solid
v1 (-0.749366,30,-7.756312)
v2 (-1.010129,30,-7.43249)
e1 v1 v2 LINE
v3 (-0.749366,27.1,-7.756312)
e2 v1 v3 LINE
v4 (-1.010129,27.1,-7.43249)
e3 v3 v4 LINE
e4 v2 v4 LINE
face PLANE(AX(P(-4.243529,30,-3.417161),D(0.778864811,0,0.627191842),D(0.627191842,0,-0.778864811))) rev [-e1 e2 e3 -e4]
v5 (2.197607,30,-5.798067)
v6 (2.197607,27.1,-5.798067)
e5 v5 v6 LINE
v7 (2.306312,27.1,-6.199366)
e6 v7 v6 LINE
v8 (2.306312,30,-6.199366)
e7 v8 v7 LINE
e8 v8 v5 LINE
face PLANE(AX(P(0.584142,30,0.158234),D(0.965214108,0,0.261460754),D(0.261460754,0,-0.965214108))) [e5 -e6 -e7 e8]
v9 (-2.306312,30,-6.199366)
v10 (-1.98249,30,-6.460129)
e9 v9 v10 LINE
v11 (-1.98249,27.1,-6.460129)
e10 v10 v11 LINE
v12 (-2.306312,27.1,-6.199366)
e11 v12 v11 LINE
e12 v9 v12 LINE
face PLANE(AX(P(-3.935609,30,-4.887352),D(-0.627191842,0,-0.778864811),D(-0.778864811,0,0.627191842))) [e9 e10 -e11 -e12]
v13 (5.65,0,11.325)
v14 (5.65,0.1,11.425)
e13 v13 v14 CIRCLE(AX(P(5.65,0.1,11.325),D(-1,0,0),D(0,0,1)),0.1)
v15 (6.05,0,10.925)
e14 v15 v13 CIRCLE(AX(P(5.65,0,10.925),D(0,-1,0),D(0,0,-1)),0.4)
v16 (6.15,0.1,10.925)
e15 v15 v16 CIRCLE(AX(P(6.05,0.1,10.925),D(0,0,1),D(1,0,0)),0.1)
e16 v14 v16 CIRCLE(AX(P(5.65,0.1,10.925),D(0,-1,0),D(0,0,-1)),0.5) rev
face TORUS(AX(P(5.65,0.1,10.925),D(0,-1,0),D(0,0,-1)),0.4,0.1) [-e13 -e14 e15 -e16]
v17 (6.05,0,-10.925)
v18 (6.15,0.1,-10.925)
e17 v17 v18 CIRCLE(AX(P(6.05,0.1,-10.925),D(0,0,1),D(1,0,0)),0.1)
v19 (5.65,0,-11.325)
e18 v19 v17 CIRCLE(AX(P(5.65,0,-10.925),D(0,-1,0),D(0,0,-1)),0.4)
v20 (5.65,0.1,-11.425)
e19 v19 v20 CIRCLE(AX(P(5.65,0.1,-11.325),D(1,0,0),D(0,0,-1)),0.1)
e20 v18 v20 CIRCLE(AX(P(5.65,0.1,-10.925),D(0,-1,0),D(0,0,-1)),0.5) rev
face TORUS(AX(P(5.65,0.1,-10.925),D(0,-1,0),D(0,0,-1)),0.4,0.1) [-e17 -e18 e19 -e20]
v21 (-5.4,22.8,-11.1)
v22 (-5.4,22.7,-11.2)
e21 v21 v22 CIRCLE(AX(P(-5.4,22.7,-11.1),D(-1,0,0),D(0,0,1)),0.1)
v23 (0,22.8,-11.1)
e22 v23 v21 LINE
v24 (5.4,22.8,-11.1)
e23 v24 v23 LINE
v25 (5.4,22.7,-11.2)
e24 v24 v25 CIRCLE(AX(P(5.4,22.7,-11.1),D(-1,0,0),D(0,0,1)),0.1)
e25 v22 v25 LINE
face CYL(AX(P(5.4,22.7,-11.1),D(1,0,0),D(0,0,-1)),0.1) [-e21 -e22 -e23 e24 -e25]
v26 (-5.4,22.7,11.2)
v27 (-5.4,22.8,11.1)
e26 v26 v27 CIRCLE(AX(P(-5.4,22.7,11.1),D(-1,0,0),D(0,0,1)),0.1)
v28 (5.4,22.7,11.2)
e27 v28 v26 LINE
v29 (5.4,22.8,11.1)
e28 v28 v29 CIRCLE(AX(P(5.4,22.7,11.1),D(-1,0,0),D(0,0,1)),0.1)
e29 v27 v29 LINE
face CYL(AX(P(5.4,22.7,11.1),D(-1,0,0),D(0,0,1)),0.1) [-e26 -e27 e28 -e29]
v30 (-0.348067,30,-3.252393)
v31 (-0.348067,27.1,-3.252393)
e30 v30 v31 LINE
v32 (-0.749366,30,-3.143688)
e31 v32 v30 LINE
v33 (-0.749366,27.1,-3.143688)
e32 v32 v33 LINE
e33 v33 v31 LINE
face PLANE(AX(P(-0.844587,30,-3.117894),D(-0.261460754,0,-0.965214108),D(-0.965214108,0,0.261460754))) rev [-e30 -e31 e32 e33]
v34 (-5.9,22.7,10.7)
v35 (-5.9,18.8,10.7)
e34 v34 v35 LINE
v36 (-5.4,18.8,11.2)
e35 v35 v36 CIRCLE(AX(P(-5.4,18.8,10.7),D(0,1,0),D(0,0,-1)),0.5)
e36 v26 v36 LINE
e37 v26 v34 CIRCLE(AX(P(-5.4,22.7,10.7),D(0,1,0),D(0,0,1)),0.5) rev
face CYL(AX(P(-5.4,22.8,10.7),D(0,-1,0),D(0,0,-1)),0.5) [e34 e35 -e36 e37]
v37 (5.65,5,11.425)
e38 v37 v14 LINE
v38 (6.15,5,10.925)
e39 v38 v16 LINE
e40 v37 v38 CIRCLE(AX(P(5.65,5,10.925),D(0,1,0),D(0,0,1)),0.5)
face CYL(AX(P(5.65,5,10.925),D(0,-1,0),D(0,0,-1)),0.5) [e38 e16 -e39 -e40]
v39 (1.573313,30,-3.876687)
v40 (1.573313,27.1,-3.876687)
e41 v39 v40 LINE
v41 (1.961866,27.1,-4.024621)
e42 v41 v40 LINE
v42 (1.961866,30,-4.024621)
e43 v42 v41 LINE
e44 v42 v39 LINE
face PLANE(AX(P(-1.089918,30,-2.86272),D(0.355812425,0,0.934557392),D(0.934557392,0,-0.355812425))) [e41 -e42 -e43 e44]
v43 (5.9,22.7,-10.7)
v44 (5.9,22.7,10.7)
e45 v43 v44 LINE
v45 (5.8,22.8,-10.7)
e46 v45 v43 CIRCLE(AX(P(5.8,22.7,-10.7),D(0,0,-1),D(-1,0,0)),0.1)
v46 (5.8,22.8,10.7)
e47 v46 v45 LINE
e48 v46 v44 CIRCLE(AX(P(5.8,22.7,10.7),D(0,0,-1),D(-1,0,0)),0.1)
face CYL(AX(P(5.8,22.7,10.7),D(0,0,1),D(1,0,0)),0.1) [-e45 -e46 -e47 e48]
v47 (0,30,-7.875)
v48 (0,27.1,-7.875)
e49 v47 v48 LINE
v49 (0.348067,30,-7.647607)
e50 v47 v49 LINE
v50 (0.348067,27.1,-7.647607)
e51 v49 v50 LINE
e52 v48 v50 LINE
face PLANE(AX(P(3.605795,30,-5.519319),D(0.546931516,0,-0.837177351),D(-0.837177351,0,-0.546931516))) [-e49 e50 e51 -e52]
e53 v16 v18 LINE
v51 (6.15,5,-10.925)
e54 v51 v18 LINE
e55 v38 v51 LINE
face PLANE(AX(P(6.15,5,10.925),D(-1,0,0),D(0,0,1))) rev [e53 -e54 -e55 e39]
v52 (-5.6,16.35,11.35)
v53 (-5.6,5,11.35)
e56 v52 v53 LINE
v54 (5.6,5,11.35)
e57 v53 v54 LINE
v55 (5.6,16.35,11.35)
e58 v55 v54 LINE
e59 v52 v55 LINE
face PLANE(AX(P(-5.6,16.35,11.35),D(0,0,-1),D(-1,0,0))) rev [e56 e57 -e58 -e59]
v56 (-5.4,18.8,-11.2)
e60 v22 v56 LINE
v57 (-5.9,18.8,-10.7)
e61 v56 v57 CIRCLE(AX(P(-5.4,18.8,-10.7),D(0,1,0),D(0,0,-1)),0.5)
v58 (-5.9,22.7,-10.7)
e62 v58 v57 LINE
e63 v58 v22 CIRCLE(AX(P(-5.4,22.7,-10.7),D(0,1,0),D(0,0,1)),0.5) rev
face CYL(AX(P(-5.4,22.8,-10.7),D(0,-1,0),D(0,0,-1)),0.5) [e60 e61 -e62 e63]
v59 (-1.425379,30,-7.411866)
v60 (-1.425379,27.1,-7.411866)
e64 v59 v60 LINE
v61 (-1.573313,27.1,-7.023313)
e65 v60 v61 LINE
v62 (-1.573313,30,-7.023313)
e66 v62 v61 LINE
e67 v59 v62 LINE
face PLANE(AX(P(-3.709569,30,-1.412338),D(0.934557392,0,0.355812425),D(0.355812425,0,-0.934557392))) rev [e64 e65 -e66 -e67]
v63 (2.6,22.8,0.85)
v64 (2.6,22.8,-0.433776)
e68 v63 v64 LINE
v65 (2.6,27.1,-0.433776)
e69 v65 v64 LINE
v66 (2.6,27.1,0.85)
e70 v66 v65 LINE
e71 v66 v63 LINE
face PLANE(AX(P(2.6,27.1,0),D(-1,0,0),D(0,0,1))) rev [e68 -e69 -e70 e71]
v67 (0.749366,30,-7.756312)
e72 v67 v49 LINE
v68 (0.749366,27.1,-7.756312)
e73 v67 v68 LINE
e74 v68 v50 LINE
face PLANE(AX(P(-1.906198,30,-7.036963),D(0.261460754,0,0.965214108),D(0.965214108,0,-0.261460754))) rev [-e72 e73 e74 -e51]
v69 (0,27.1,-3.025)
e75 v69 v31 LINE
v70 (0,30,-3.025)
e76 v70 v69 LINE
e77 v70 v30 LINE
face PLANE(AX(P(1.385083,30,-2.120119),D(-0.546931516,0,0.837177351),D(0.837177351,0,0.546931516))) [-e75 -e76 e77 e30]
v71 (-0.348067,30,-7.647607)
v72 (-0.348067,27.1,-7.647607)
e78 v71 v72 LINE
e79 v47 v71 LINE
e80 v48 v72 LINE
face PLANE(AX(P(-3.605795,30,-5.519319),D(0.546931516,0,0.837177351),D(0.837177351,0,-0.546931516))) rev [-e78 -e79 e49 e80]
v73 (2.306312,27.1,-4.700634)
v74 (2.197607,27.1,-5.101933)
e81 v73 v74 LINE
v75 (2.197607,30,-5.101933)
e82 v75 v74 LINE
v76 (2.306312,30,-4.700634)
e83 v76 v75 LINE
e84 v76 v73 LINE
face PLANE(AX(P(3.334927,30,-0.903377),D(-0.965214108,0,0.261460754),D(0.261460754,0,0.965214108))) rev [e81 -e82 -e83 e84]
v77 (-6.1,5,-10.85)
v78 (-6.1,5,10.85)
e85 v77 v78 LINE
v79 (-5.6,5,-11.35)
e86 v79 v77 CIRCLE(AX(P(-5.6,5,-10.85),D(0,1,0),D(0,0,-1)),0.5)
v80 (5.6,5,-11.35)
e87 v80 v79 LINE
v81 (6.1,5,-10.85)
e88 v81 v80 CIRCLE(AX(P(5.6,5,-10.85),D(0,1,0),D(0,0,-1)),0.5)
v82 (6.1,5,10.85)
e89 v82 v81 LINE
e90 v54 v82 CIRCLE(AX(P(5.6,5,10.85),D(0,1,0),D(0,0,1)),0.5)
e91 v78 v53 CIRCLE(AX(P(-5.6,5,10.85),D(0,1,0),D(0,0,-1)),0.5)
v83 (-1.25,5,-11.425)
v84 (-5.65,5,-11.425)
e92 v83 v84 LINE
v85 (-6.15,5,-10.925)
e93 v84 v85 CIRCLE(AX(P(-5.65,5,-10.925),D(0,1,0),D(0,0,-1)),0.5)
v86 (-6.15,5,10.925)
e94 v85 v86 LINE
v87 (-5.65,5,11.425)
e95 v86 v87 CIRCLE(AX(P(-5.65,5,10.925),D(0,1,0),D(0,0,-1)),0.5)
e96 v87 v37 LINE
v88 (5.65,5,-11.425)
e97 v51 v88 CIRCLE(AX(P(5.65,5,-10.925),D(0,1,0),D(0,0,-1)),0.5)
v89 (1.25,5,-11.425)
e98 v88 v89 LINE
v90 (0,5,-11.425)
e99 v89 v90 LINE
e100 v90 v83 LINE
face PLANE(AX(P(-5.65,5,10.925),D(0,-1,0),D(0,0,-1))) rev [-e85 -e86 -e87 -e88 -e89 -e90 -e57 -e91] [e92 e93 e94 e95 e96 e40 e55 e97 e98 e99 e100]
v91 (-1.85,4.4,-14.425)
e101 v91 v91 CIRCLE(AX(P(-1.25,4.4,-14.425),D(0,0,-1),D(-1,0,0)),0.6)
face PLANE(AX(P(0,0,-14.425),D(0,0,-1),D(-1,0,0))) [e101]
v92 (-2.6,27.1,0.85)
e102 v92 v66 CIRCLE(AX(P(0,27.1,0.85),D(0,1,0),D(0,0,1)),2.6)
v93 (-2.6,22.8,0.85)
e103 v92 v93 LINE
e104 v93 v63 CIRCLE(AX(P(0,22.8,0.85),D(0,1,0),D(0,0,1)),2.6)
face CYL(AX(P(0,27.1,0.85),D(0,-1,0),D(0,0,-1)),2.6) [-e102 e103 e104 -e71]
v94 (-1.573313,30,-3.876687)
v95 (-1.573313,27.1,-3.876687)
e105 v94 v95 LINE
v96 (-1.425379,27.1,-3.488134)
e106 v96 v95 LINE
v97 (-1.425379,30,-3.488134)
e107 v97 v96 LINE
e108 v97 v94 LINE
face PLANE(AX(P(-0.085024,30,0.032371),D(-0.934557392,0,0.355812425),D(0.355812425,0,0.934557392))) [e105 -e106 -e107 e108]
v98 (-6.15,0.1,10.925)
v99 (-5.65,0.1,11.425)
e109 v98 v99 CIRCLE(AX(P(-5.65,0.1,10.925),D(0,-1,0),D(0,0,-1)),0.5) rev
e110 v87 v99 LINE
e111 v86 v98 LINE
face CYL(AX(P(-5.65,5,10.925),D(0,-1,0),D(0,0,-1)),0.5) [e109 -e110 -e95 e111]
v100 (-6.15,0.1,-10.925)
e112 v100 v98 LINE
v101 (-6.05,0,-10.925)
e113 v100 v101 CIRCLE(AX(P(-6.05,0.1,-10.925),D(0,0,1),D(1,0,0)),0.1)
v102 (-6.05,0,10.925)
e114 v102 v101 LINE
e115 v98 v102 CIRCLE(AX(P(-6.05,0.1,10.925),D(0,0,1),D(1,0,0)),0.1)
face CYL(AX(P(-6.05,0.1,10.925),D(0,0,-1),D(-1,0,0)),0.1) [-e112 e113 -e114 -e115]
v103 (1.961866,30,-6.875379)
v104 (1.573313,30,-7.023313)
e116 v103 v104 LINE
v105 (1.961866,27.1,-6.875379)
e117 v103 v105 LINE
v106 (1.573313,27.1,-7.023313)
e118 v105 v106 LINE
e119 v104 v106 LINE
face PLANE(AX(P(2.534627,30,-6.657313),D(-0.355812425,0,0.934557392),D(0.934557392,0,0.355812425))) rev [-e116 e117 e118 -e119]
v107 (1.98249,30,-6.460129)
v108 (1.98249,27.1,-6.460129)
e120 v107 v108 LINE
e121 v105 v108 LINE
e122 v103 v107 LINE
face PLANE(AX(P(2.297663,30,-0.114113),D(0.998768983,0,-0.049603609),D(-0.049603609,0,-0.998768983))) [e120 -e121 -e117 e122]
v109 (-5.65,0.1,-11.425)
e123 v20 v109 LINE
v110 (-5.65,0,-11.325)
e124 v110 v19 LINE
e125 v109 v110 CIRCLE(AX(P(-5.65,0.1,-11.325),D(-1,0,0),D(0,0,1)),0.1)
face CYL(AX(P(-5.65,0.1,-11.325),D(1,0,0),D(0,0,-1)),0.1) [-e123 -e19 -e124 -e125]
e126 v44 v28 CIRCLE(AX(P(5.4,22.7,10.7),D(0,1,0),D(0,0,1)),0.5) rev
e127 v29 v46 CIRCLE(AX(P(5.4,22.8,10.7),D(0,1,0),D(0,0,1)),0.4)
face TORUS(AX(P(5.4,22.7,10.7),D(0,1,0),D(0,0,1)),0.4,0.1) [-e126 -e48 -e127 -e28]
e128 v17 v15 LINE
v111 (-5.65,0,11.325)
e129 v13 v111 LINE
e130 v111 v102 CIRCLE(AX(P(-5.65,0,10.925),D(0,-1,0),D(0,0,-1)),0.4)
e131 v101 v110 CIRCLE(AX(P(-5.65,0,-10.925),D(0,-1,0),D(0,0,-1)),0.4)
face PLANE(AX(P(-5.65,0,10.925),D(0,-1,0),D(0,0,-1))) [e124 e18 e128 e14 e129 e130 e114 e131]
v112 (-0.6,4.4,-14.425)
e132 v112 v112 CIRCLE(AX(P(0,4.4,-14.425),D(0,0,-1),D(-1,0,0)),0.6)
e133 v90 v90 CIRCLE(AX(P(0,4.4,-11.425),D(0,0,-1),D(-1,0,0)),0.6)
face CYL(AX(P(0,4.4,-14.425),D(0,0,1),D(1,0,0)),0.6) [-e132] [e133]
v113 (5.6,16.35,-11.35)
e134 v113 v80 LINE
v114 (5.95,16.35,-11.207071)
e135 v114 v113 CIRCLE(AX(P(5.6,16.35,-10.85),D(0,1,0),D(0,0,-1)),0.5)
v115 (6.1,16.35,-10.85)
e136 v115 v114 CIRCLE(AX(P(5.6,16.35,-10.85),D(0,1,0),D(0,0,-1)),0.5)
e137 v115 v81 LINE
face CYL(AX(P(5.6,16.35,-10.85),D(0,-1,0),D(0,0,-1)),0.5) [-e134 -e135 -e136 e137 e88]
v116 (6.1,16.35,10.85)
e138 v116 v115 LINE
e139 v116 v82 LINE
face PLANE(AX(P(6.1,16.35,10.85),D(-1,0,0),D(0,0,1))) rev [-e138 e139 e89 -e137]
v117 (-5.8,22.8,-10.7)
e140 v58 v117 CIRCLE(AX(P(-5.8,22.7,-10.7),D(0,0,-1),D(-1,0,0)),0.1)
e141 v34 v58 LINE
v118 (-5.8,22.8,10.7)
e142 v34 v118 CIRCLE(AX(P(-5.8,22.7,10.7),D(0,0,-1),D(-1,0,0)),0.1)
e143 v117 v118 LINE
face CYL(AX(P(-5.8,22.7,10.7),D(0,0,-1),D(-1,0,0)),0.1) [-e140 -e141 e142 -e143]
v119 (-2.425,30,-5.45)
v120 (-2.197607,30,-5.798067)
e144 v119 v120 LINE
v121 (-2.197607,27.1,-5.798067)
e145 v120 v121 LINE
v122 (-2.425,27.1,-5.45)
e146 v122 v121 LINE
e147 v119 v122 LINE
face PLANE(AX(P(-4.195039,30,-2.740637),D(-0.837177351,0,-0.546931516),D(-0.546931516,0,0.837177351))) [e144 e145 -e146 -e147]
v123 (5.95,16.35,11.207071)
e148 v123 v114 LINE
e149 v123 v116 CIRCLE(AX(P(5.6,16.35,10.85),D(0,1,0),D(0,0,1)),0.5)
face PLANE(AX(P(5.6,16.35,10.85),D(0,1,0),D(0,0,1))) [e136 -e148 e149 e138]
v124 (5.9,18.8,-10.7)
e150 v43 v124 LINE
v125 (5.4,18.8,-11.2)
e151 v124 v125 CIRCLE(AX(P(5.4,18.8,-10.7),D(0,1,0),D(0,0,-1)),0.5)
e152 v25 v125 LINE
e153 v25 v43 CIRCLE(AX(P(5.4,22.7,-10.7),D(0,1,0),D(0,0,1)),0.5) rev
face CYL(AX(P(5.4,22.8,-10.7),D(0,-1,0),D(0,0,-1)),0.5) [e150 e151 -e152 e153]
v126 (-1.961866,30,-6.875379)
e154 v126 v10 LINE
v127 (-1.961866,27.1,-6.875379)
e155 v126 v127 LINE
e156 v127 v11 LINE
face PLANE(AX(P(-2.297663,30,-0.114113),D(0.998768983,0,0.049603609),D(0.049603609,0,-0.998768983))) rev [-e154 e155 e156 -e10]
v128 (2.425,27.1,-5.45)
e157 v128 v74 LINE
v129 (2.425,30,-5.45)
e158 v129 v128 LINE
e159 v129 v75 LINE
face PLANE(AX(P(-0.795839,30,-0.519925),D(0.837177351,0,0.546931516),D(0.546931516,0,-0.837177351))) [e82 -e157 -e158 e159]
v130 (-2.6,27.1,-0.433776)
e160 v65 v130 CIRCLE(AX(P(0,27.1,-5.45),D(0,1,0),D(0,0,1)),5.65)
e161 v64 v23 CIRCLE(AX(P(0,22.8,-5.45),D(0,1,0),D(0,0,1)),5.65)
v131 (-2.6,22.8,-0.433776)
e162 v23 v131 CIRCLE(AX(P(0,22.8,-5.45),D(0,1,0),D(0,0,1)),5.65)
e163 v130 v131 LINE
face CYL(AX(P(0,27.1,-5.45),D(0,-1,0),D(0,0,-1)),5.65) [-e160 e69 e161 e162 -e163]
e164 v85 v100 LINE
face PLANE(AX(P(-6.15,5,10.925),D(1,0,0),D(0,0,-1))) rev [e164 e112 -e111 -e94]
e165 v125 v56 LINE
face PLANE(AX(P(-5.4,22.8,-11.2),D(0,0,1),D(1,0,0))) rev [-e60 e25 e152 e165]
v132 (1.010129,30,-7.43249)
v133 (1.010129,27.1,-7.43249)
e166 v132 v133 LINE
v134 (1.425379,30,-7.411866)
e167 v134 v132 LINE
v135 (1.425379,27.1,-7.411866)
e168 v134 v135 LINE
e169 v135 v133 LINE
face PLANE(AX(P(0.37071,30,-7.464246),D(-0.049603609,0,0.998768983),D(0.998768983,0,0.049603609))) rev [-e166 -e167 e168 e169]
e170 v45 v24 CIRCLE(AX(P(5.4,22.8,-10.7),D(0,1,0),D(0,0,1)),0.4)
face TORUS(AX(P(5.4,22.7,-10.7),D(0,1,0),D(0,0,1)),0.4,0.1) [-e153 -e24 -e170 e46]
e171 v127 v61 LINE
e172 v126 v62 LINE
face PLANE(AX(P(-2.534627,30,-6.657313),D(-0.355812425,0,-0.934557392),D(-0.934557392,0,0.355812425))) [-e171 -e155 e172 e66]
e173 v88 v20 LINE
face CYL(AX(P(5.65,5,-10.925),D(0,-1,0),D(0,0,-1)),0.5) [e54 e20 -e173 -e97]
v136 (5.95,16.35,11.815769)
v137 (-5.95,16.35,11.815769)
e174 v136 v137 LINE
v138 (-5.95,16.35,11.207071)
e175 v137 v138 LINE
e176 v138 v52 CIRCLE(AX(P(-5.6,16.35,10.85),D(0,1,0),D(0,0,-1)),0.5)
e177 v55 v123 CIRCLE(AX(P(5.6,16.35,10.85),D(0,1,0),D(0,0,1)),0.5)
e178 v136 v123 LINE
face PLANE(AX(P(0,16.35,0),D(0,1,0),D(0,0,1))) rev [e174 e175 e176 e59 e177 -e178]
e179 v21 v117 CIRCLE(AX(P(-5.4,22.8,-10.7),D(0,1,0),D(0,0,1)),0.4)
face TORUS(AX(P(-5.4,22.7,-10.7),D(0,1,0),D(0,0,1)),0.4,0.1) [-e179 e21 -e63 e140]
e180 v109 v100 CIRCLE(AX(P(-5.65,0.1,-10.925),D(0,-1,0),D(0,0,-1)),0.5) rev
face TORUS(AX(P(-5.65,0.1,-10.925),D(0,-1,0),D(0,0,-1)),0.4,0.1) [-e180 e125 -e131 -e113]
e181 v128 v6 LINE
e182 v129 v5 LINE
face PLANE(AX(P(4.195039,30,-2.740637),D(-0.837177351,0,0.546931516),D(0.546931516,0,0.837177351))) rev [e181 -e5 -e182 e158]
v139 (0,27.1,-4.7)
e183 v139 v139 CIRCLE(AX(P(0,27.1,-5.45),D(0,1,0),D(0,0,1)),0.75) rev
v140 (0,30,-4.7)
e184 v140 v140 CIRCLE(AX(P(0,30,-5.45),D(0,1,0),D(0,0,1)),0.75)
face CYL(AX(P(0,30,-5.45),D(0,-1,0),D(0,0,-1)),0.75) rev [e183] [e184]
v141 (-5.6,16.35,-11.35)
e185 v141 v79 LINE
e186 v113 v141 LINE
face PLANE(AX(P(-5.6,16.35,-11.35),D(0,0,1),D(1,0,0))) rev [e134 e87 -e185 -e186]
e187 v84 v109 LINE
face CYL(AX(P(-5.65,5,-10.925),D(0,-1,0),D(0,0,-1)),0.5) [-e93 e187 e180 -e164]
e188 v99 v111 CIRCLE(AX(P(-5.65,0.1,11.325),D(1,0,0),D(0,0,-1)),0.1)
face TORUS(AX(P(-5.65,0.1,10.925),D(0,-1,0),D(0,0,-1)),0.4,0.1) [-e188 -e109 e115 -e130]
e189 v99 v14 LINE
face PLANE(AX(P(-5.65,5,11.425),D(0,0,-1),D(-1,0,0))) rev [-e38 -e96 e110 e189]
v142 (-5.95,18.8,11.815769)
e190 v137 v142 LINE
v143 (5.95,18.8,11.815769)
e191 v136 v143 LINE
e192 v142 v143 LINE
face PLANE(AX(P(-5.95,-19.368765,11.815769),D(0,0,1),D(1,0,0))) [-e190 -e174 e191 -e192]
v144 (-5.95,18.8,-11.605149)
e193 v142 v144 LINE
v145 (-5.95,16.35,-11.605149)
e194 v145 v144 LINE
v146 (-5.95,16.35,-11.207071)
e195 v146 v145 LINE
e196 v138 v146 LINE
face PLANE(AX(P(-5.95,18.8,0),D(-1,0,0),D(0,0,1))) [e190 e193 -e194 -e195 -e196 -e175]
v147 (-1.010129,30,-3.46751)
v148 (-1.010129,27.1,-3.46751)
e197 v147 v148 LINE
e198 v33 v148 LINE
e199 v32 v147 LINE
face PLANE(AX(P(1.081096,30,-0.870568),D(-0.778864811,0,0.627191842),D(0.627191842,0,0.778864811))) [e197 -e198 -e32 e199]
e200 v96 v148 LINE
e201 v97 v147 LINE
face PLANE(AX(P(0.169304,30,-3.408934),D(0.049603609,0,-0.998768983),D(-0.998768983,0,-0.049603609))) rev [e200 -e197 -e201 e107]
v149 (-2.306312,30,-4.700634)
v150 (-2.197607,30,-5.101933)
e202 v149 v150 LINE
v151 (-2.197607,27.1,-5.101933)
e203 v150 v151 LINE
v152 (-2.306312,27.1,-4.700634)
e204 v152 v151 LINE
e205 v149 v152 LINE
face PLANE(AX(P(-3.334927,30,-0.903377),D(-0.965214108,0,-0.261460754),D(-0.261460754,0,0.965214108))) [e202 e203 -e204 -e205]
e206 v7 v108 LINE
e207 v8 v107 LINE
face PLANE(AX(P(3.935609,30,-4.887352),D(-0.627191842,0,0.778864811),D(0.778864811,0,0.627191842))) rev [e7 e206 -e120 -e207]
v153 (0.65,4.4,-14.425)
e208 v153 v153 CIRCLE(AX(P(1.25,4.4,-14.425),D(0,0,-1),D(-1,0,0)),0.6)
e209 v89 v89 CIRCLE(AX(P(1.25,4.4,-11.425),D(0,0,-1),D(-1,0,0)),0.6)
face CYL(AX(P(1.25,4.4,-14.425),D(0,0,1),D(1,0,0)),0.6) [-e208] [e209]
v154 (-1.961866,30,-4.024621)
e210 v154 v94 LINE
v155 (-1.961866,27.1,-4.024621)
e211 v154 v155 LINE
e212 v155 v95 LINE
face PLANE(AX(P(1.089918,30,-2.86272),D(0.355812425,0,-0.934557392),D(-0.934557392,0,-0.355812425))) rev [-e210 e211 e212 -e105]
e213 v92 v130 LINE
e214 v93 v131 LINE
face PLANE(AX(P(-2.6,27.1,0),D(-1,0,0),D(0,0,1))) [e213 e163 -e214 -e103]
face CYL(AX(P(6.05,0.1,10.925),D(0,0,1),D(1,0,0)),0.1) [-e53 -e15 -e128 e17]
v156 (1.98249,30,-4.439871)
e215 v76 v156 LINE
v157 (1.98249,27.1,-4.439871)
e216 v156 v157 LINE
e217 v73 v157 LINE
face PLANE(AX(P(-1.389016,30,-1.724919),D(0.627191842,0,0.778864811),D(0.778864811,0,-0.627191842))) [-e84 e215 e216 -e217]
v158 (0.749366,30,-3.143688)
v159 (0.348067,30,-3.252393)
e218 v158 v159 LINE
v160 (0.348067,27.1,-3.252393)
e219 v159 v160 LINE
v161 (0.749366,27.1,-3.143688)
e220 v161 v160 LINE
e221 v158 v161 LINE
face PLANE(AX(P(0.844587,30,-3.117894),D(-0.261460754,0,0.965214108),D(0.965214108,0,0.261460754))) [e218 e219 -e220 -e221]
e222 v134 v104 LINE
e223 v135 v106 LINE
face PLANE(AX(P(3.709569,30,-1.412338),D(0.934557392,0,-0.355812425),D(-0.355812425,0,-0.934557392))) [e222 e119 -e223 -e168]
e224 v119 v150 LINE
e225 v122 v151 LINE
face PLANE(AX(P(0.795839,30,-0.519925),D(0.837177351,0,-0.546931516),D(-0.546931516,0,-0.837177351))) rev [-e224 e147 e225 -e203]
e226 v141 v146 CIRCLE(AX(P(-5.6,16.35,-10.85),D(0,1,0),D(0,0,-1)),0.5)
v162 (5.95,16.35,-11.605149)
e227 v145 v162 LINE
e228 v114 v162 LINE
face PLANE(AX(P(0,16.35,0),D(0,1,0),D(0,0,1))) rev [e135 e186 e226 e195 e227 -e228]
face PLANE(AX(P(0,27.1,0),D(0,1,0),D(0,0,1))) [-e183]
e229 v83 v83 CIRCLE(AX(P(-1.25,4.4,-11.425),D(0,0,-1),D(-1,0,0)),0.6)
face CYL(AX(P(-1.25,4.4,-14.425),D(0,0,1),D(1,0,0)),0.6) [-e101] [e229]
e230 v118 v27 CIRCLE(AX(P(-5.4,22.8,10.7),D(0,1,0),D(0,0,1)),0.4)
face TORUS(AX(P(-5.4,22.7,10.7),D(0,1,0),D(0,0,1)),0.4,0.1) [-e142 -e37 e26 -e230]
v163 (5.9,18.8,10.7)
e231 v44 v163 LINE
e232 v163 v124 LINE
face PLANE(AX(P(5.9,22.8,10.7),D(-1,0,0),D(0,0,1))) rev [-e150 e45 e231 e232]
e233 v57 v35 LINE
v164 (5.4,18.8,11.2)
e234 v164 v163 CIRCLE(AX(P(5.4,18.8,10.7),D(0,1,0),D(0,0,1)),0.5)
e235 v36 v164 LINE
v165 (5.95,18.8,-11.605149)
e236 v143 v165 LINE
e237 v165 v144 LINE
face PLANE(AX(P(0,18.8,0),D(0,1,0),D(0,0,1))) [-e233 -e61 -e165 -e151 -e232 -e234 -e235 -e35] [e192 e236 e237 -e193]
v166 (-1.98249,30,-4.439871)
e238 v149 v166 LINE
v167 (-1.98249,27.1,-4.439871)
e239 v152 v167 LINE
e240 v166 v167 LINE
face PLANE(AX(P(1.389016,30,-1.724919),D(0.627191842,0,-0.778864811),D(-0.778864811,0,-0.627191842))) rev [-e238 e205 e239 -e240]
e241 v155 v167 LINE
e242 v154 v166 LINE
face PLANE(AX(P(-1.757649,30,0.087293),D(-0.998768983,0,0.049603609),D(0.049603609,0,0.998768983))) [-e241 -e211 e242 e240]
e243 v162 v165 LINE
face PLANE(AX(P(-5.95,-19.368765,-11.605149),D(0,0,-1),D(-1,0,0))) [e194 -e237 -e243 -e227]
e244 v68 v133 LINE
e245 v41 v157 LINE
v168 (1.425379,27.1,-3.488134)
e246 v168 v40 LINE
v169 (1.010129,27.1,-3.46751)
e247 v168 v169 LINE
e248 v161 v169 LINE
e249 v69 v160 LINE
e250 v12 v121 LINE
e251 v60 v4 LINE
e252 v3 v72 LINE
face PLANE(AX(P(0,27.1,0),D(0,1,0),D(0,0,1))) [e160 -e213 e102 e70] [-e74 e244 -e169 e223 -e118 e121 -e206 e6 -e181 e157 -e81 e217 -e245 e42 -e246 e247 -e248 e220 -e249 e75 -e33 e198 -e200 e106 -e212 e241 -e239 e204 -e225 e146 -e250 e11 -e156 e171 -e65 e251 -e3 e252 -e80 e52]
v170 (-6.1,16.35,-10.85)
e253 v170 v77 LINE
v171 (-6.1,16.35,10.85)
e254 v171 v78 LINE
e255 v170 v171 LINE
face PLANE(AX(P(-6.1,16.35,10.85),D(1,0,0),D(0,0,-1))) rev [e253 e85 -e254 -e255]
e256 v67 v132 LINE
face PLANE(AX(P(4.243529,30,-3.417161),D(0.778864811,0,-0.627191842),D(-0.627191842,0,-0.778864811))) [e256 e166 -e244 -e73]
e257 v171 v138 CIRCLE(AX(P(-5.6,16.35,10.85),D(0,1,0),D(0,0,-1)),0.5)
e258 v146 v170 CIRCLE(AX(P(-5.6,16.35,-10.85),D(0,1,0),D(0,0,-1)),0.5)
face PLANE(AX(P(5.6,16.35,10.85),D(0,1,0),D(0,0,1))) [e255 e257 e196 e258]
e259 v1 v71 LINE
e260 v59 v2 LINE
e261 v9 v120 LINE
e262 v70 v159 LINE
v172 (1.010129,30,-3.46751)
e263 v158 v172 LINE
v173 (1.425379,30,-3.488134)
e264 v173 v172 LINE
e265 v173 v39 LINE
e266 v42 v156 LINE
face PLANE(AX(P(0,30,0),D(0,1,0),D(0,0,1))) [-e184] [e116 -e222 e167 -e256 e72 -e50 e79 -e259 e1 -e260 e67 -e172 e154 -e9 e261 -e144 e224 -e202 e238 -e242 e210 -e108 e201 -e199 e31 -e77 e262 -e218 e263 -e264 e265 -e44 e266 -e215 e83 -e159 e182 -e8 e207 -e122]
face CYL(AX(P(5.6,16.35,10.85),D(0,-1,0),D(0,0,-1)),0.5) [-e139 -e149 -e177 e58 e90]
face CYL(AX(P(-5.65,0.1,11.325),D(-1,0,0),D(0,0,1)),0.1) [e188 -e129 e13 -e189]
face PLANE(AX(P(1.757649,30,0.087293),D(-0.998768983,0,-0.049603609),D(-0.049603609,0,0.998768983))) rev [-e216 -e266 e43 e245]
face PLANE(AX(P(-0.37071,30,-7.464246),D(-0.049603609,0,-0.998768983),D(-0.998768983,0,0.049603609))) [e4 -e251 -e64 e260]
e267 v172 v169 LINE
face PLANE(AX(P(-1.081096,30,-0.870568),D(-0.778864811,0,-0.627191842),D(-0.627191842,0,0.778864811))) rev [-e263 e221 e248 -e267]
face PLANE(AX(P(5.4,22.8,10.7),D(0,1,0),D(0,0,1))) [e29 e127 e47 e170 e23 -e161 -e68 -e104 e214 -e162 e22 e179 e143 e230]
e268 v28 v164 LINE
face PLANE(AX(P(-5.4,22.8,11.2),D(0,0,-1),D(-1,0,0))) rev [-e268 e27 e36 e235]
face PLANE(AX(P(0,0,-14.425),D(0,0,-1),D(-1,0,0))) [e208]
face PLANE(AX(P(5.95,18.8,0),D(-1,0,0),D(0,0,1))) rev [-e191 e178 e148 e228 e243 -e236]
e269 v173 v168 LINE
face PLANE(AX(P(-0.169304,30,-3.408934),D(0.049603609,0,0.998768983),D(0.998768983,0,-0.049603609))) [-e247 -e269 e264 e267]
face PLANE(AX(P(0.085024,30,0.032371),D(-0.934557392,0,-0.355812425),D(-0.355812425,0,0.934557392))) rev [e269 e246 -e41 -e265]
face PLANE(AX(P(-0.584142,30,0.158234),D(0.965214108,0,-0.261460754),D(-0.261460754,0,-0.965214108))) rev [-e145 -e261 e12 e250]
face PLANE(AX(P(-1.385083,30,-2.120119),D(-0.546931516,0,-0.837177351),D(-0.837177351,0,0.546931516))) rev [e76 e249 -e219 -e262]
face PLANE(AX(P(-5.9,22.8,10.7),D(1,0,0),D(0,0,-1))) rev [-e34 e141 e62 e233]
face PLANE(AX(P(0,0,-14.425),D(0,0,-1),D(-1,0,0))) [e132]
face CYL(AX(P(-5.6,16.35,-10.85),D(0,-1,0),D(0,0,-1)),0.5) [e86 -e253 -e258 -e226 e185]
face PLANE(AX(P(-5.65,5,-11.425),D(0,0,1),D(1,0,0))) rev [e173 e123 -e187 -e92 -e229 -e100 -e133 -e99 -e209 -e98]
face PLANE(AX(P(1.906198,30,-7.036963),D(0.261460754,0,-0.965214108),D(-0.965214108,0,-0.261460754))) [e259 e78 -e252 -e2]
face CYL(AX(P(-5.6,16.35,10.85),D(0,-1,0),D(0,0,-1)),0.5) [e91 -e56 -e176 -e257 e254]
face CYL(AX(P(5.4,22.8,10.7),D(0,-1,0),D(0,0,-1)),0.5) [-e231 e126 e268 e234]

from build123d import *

# Parameters (mm, degrees)
Y_KSEKLIK_EKSTR_ZYON1_DEPTH = 5
Y_KSEKLIK_EKSTR_ZYON2_DEPTH = 11.35
Y_KSEKLIK_EKSTR_ZYON3_DEPTH = 2.45
Y_KSEKLIK_EKSTR_ZYON4_DEPTH = 4
IZIM5_R                     = 5.65
Y_KSEKLIK_EKSTR_ZYON5_DEPTH = 4.3
IZIM7_R                     = 0.75
Y_KSEKLIK_EKSTR_ZYON6_DEPTH = 2.9
RADYUS1_R                   = 0.1
IZIM8_R                     = 0.6
Y_KSEKLIK_EKSTR_ZYON7_DEPTH = 3
SKETCH1_OUTSIDE_W           = 23.446
SKETCH1_OUTSIDE_H           = 43.396
SKETCH1_OUTSIDE_W_2         = 11.9
SKETCH1_OUTSIDE_H_2         = 23.420918094
CUT_EXTRUDE1_DEPTH          = 2.45


with BuildPart() as part:
    # Çizim1 → Yükseklik-Ekstrüzyon1 (new body)
    with BuildSketch(Plane(origin=(0, 0, 0), x_dir=(1, 0, 0), z_dir=(0, 1, 0))):
        with BuildLine():
            Line((-5.65, -11.425), (5.65, -11.425))
            ThreePointArc((5.65, -11.425), (6.003553391, -11.278553391), (6.15, -10.925))
            Line((6.15, -10.925), (6.15, 10.925))
            ThreePointArc((6.15, 10.925), (6.003553391, 11.278553391), (5.65, 11.425))
            Line((5.65, 11.425), (-5.65, 11.425))
            ThreePointArc((-5.65, 11.425), (-6.003553391, 11.278553391), (-6.15, 10.925))
            Line((-6.15, 10.925), (-6.15, -10.925))
            ThreePointArc((-6.15, -10.925), (-6.003553391, -11.278553391), (-5.65, -11.425))
        make_face()
    extrude(amount=Y_KSEKLIK_EKSTR_ZYON1_DEPTH)

    # Çizim2 → Yükseklik-Ekstrüzyon2 (add)
    with BuildSketch(Plane(origin=(0, 5, 0), x_dir=(1, 0, 0), z_dir=(0, 1, 0))):
        with BuildLine():
            Line((-5.6, -11.35), (5.6, -11.35))
            ThreePointArc((5.6, -11.35), (5.953553391, -11.203553391), (6.1, -10.85))
            Line((6.1, -10.85), (6.1, 10.85))
            ThreePointArc((6.1, 10.85), (5.953553391, 11.203553391), (5.6, 11.35))
            Line((5.6, 11.35), (-5.6, 11.35))
            ThreePointArc((-5.6, 11.35), (-5.953553391, 11.203553391), (-6.1, 10.85))
            Line((-6.1, 10.85), (-6.1, -10.85))
            ThreePointArc((-6.1, -10.85), (-5.953553391, -11.203553391), (-5.6, -11.35))
        make_face()
    extrude(amount=Y_KSEKLIK_EKSTR_ZYON2_DEPTH)

    # Çizim3 → Yükseklik-Ekstrüzyon3 (add)
    with BuildSketch(Plane(origin=(0, 16.35, 0), x_dir=(1, 0, 0), z_dir=(0, 1, 0))):
        with BuildLine():
            Line((-5.95, 15.625), (-5.95, 11.207071421))
            ThreePointArc((-5.95, 11.207071421), (-5.789029481, 11.31289076), (-5.6, 11.35))
            Line((-5.6, 11.35), (5.6, 11.35))
            ThreePointArc((5.6, 11.35), (5.789029481, 11.31289076), (5.95, 11.207071421))
            Line((5.95, 11.207071421), (5.95, 15.625))
            ThreePointArc((5.95, 15.625), (5.803553391, 15.978553391), (5.45, 16.125))
            Line((5.45, 16.125), (0.5, 16.125))
            Line((0.5, 16.125), (0.5, 14.991025404))
            ThreePointArc((0.5, 14.991025404), (0, 13.125), (-0.5, 14.991025404))
            Line((-0.5, 14.991025404), (-0.5, 16.125))
            Line((-0.5, 16.125), (-5.45, 16.125))
            ThreePointArc((-5.45, 16.125), (-5.803553391, 15.978553391), (-5.95, 15.625))
        make_face()
        with BuildLine():
            Line((-5.95, 11.207071421), (-5.95, -11.207071421))
            ThreePointArc((-5.95, -11.207071421), (-5.789029481, -11.31289076), (-5.6, -11.35))
            Line((-5.6, -11.35), (5.6, -11.35))
            ThreePointArc((5.6, -11.35), (5.789029481, -11.31289076), (5.95, -11.207071421))
            Line((5.95, -11.207071421), (5.95, 11.207071421))
            ThreePointArc((5.95, 11.207071421), (5.789029481, 11.31289076), (5.6, 11.35))
            Line((5.6, 11.35), (-5.6, 11.35))
            ThreePointArc((-5.6, 11.35), (-5.789029481, 11.31289076), (-5.95, 11.207071421))
        make_face()
        with BuildLine():
            ThreePointArc((-5.95, -15.625), (-5.803553391, -15.978553391), (-5.45, -16.125))
            Line((-5.45, -16.125), (-0.5, -16.125))
            Line((-0.5, -16.125), (-0.5, -14.991025404))
            ThreePointArc((-0.5, -14.991025404), (0, -13.125), (0.5, -14.991025404))
            Line((0.5, -14.991025404), (0.5, -16.125))
            Line((0.5, -16.125), (5.45, -16.125))
            ThreePointArc((5.45, -16.125), (5.803553391, -15.978553391), (5.95, -15.625))
            Line((5.95, -15.625), (5.95, -11.207071421))
            ThreePointArc((5.95, -11.207071421), (5.789029481, -11.31289076), (5.6, -11.35))
            Line((5.6, -11.35), (-5.6, -11.35))
            ThreePointArc((-5.6, -11.35), (-5.789029481, -11.31289076), (-5.95, -11.207071421))
            Line((-5.95, -11.207071421), (-5.95, -15.625))
        make_face()
    extrude(amount=Y_KSEKLIK_EKSTR_ZYON3_DEPTH)

    # Çizim4 → Yükseklik-Ekstrüzyon4 (add)
    with BuildSketch(Plane(origin=(0, 18.8, 0), x_dir=(1, 0, 0), z_dir=(0, 1, 0))):
        with BuildLine():
            Line((-5.4, -11.2), (5.4, -11.2))
            ThreePointArc((5.4, -11.2), (5.753553391, -11.053553391), (5.9, -10.7))
            Line((5.9, -10.7), (5.9, 10.7))
            ThreePointArc((5.9, 10.7), (5.753553391, 11.053553391), (5.4, 11.2))
            Line((5.4, 11.2), (-5.4, 11.2))
            ThreePointArc((-5.4, 11.2), (-5.753553391, 11.053553391), (-5.9, 10.7))
            Line((-5.9, 10.7), (-5.9, -10.7))
            ThreePointArc((-5.9, -10.7), (-5.753553391, -11.053553391), (-5.4, -11.2))
        make_face()
    extrude(amount=Y_KSEKLIK_EKSTR_ZYON4_DEPTH)

    # Çizim5 → Yükseklik-Ekstrüzyon5 (add)
    with BuildSketch(Plane(origin=(0, 22.8, 0), x_dir=(1, 0, 0), z_dir=(0, 1, 0))):
        with Locations((0, 5.45)):
            Circle(IZIM5_R)
        with BuildLine():
            ThreePointArc((-2.6, -0.85), (0, -3.45), (2.6, -0.85))
            Line((2.6, -0.85), (2.6, 0.433776321))
            ThreePointArc((2.6, 0.433776321), (0, -0.2), (-2.6, 0.433776321))
            Line((-2.6, 0.433776321), (-2.6, -0.85))
        make_face()
    extrude(amount=Y_KSEKLIK_EKSTR_ZYON5_DEPTH)

    # Çizim7 → Yükseklik-Ekstrüzyon6 (add)
    # profile 1 of 21: a face of its own
    with BuildSketch(Plane(origin=(0, 27.1, 0), x_dir=(1, 0, 0), z_dir=(0, 1, 0))):
        Polygon((1.982489516, 6.460128862), (1.573312588, 7.023312588), (1.010128862, 7.432489516), (0.348066685, 7.647606558), (-0.348066685, 7.647606558), (-1.010128862, 7.432489516), (-1.573312588, 7.023312588), (-1.982489516, 6.460128862), (-2.197606558, 5.798066685), (-2.197606558, 5.101933315), (-1.982489516, 4.439871138), (-1.573312588, 3.876687412), (-1.010128862, 3.467510484), (-0.348066685, 3.252393442), (0.348066685, 3.252393442), (1.010128862, 3.467510484), (1.573312588, 3.876687412), (1.982489516, 4.439871138), (2.197606558, 5.101933315), (2.197606558, 5.798066685), align=None)
        with Locations(Location((0, 5.45, 0), (0, 0, 270))):
            Circle(IZIM7_R, mode=Mode.SUBTRACT)
    # profile 2 of 21: a face of its own
    with BuildSketch(Plane(origin=(0, 27.1, 0), x_dir=(1, 0, 0), z_dir=(0, 1, 0))):
        Polygon((-0.749366211, 7.756312052), (-0.348066685, 7.647606558), (-1.010128862, 7.432489516), align=None)
    # profile 3 of 21: a face of its own
    with BuildSketch(Plane(origin=(0, 27.1, 0), x_dir=(1, 0, 0), z_dir=(0, 1, 0))):
        Polygon((0, 7.875), (0.348066685, 7.647606558), (-0.348066685, 7.647606558), align=None)
    # profile 4 of 21: a face of its own
    with BuildSketch(Plane(origin=(0, 27.1, 0), x_dir=(1, 0, 0), z_dir=(0, 1, 0))):
        Polygon((-1.425379237, 7.411866211), (-1.010128862, 7.432489516), (-1.573312588, 7.023312588), align=None)
    # profile 5 of 21: a face of its own
    with BuildSketch(Plane(origin=(0, 27.1, 0), x_dir=(1, 0, 0), z_dir=(0, 1, 0))):
        Polygon((-1.961866211, 6.875379237), (-1.573312588, 7.023312588), (-1.982489516, 6.460128862), align=None)
    # profile 6 of 21: a face of its own
    with BuildSketch(Plane(origin=(0, 27.1, 0), x_dir=(1, 0, 0), z_dir=(0, 1, 0))):
        Polygon((-2.306312052, 6.199366211), (-1.982489516, 6.460128862), (-2.197606558, 5.798066685), align=None)
    # profile 7 of 21: a face of its own
    with BuildSketch(Plane(origin=(0, 27.1, 0), x_dir=(1, 0, 0), z_dir=(0, 1, 0))):
        Polygon((-2.306312052, 4.700633789), (-2.197606558, 5.101933315), (-1.982489516, 4.439871138), align=None)
    # profile 8 of 21: a face of its own
    with BuildSketch(Plane(origin=(0, 27.1, 0), x_dir=(1, 0, 0), z_dir=(0, 1, 0))):
        Polygon((-2.425, 5.45), (-2.197606558, 5.798066685), (-2.197606558, 5.101933315), align=None)
    # profile 9 of 21: a face of its own
    with BuildSketch(Plane(origin=(0, 27.1, 0), x_dir=(1, 0, 0), z_dir=(0, 1, 0))):
        Polygon((-1.961866211, 4.024620763), (-1.982489516, 4.439871138), (-1.573312588, 3.876687412), align=None)
    # profile 10 of 21: a face of its own
    with BuildSketch(Plane(origin=(0, 27.1, 0), x_dir=(1, 0, 0), z_dir=(0, 1, 0))):
        Polygon((-1.425379237, 3.488133789), (-1.573312588, 3.876687412), (-1.010128862, 3.467510484), align=None)
    # profile 11 of 21: a face of its own
    with BuildSketch(Plane(origin=(0, 27.1, 0), x_dir=(1, 0, 0), z_dir=(0, 1, 0))):
        Polygon((-0.749366211, 3.143687948), (-1.010128862, 3.467510484), (-0.348066685, 3.252393442), align=None)
    # profile 12 of 21: a face of its own
    with BuildSketch(Plane(origin=(0, 27.1, 0), x_dir=(1, 0, 0), z_dir=(0, 1, 0))):
        Polygon((0, 3.025), (-0.348066685, 3.252393442), (0.348066685, 3.252393442), align=None)
    # profile 13 of 21: a face of its own
    with BuildSketch(Plane(origin=(0, 27.1, 0), x_dir=(1, 0, 0), z_dir=(0, 1, 0))):
        Polygon((0.749366211, 3.143687948), (0.348066685, 3.252393442), (1.010128862, 3.467510484), align=None)
    # profile 14 of 21: a face of its own
    with BuildSketch(Plane(origin=(0, 27.1, 0), x_dir=(1, 0, 0), z_dir=(0, 1, 0))):
        Polygon((0.749366211, 7.756312052), (1.010128862, 7.432489516), (0.348066685, 7.647606558), align=None)
    # profile 15 of 21: a face of its own
    with BuildSketch(Plane(origin=(0, 27.1, 0), x_dir=(1, 0, 0), z_dir=(0, 1, 0))):
        Polygon((1.425379237, 7.411866211), (1.573312588, 7.023312588), (1.010128862, 7.432489516), align=None)
    # profile 16 of 21: a face of its own
    with BuildSketch(Plane(origin=(0, 27.1, 0), x_dir=(1, 0, 0), z_dir=(0, 1, 0))):
        Polygon((1.961866211, 6.875379237), (1.982489516, 6.460128862), (1.573312588, 7.023312588), align=None)
    # profile 17 of 21: a face of its own
    with BuildSketch(Plane(origin=(0, 27.1, 0), x_dir=(1, 0, 0), z_dir=(0, 1, 0))):
        Polygon((2.306312052, 6.199366211), (2.197606558, 5.798066685), (1.982489516, 6.460128862), align=None)
    # profile 18 of 21: a face of its own
    with BuildSketch(Plane(origin=(0, 27.1, 0), x_dir=(1, 0, 0), z_dir=(0, 1, 0))):
        Polygon((2.425, 5.45), (2.197606558, 5.101933315), (2.197606558, 5.798066685), align=None)
    # profile 19 of 21: a face of its own
    with BuildSketch(Plane(origin=(0, 27.1, 0), x_dir=(1, 0, 0), z_dir=(0, 1, 0))):
        Polygon((2.306312052, 4.700633789), (1.982489516, 4.439871138), (2.197606558, 5.101933315), align=None)
    # profile 20 of 21: a face of its own
    with BuildSketch(Plane(origin=(0, 27.1, 0), x_dir=(1, 0, 0), z_dir=(0, 1, 0))):
        Polygon((1.961866211, 4.024620763), (1.573312588, 3.876687412), (1.982489516, 4.439871138), align=None)
    # profile 21 of 21: a face of its own
    with BuildSketch(Plane(origin=(0, 27.1, 0), x_dir=(1, 0, 0), z_dir=(0, 1, 0))):
        Polygon((1.425379237, 3.488133789), (1.010128862, 3.467510484), (1.573312588, 3.876687412), align=None)
    extrude(amount=Y_KSEKLIK_EKSTR_ZYON6_DEPTH)

    # Radyus1
    radyus1_edges = [part.edges().sort_by_distance(p)[0] for p in [
        (0, 22.8, -11.2),
        (-5.753553391, 22.8, -11.053553391),
        (-5.9, 22.8, 0),
        (-5.753553391, 22.8, 11.053553391),
        (0, 0, 11.425),
        (0, 22.8, 11.2),
        (-6.003553391, 0, 11.278553391),
        (-6.15, 0, 0),
        (-6.003553391, 0, -11.278553391),
        (0, 0, -11.425),
        (6.003553391, 0, -11.278553391),
        (6.15, 0, 0),
        (6.003553391, 0, 11.278553391),
        (5.753553391, 22.8, 11.053553391),
        (5.9, 22.8, 0),
        (5.753553391, 22.8, -11.053553391),
    ]]
    fillet(radyus1_edges, radius=RADYUS1_R - 0.0001)  # a hair under: the kernel refuses the full size

    # Çizim8 → Yükseklik-Ekstrüzyon7 (add)
    with BuildSketch(Plane(origin=(0, 0, -11.425), x_dir=(-1, 0, 0), z_dir=(0, 0, -1))):
        with Locations(Location((-1.25, 4.4, 0), (0, 0, 90))):
            Circle(IZIM8_R)
        with Locations(Location((0, 4.4, 0), (0, 0, 90))):
            Circle(IZIM8_R)
        with Locations(Location((1.25, 4.4, 0), (0, 0, 90))):
            Circle(IZIM8_R)
    extrude(amount=Y_KSEKLIK_EKSTR_ZYON7_DEPTH)

    # Sketch1 outside → Cut-Extrude1 (cut)
    with BuildSketch(Plane(origin=(0, 18.8, 0), x_dir=(1, 0, 0), z_dir=(0, 1, 0))):
        Rectangle(SKETCH1_OUTSIDE_W, SKETCH1_OUTSIDE_H)
        with Locations((0, -0.105309884)):
            Rectangle(SKETCH1_OUTSIDE_W_2, SKETCH1_OUTSIDE_H_2, mode=Mode.SUBTRACT)
    extrude(amount=-CUT_EXTRUDE1_DEPTH, mode=Mode.SUBTRACT)


solid = part.part
